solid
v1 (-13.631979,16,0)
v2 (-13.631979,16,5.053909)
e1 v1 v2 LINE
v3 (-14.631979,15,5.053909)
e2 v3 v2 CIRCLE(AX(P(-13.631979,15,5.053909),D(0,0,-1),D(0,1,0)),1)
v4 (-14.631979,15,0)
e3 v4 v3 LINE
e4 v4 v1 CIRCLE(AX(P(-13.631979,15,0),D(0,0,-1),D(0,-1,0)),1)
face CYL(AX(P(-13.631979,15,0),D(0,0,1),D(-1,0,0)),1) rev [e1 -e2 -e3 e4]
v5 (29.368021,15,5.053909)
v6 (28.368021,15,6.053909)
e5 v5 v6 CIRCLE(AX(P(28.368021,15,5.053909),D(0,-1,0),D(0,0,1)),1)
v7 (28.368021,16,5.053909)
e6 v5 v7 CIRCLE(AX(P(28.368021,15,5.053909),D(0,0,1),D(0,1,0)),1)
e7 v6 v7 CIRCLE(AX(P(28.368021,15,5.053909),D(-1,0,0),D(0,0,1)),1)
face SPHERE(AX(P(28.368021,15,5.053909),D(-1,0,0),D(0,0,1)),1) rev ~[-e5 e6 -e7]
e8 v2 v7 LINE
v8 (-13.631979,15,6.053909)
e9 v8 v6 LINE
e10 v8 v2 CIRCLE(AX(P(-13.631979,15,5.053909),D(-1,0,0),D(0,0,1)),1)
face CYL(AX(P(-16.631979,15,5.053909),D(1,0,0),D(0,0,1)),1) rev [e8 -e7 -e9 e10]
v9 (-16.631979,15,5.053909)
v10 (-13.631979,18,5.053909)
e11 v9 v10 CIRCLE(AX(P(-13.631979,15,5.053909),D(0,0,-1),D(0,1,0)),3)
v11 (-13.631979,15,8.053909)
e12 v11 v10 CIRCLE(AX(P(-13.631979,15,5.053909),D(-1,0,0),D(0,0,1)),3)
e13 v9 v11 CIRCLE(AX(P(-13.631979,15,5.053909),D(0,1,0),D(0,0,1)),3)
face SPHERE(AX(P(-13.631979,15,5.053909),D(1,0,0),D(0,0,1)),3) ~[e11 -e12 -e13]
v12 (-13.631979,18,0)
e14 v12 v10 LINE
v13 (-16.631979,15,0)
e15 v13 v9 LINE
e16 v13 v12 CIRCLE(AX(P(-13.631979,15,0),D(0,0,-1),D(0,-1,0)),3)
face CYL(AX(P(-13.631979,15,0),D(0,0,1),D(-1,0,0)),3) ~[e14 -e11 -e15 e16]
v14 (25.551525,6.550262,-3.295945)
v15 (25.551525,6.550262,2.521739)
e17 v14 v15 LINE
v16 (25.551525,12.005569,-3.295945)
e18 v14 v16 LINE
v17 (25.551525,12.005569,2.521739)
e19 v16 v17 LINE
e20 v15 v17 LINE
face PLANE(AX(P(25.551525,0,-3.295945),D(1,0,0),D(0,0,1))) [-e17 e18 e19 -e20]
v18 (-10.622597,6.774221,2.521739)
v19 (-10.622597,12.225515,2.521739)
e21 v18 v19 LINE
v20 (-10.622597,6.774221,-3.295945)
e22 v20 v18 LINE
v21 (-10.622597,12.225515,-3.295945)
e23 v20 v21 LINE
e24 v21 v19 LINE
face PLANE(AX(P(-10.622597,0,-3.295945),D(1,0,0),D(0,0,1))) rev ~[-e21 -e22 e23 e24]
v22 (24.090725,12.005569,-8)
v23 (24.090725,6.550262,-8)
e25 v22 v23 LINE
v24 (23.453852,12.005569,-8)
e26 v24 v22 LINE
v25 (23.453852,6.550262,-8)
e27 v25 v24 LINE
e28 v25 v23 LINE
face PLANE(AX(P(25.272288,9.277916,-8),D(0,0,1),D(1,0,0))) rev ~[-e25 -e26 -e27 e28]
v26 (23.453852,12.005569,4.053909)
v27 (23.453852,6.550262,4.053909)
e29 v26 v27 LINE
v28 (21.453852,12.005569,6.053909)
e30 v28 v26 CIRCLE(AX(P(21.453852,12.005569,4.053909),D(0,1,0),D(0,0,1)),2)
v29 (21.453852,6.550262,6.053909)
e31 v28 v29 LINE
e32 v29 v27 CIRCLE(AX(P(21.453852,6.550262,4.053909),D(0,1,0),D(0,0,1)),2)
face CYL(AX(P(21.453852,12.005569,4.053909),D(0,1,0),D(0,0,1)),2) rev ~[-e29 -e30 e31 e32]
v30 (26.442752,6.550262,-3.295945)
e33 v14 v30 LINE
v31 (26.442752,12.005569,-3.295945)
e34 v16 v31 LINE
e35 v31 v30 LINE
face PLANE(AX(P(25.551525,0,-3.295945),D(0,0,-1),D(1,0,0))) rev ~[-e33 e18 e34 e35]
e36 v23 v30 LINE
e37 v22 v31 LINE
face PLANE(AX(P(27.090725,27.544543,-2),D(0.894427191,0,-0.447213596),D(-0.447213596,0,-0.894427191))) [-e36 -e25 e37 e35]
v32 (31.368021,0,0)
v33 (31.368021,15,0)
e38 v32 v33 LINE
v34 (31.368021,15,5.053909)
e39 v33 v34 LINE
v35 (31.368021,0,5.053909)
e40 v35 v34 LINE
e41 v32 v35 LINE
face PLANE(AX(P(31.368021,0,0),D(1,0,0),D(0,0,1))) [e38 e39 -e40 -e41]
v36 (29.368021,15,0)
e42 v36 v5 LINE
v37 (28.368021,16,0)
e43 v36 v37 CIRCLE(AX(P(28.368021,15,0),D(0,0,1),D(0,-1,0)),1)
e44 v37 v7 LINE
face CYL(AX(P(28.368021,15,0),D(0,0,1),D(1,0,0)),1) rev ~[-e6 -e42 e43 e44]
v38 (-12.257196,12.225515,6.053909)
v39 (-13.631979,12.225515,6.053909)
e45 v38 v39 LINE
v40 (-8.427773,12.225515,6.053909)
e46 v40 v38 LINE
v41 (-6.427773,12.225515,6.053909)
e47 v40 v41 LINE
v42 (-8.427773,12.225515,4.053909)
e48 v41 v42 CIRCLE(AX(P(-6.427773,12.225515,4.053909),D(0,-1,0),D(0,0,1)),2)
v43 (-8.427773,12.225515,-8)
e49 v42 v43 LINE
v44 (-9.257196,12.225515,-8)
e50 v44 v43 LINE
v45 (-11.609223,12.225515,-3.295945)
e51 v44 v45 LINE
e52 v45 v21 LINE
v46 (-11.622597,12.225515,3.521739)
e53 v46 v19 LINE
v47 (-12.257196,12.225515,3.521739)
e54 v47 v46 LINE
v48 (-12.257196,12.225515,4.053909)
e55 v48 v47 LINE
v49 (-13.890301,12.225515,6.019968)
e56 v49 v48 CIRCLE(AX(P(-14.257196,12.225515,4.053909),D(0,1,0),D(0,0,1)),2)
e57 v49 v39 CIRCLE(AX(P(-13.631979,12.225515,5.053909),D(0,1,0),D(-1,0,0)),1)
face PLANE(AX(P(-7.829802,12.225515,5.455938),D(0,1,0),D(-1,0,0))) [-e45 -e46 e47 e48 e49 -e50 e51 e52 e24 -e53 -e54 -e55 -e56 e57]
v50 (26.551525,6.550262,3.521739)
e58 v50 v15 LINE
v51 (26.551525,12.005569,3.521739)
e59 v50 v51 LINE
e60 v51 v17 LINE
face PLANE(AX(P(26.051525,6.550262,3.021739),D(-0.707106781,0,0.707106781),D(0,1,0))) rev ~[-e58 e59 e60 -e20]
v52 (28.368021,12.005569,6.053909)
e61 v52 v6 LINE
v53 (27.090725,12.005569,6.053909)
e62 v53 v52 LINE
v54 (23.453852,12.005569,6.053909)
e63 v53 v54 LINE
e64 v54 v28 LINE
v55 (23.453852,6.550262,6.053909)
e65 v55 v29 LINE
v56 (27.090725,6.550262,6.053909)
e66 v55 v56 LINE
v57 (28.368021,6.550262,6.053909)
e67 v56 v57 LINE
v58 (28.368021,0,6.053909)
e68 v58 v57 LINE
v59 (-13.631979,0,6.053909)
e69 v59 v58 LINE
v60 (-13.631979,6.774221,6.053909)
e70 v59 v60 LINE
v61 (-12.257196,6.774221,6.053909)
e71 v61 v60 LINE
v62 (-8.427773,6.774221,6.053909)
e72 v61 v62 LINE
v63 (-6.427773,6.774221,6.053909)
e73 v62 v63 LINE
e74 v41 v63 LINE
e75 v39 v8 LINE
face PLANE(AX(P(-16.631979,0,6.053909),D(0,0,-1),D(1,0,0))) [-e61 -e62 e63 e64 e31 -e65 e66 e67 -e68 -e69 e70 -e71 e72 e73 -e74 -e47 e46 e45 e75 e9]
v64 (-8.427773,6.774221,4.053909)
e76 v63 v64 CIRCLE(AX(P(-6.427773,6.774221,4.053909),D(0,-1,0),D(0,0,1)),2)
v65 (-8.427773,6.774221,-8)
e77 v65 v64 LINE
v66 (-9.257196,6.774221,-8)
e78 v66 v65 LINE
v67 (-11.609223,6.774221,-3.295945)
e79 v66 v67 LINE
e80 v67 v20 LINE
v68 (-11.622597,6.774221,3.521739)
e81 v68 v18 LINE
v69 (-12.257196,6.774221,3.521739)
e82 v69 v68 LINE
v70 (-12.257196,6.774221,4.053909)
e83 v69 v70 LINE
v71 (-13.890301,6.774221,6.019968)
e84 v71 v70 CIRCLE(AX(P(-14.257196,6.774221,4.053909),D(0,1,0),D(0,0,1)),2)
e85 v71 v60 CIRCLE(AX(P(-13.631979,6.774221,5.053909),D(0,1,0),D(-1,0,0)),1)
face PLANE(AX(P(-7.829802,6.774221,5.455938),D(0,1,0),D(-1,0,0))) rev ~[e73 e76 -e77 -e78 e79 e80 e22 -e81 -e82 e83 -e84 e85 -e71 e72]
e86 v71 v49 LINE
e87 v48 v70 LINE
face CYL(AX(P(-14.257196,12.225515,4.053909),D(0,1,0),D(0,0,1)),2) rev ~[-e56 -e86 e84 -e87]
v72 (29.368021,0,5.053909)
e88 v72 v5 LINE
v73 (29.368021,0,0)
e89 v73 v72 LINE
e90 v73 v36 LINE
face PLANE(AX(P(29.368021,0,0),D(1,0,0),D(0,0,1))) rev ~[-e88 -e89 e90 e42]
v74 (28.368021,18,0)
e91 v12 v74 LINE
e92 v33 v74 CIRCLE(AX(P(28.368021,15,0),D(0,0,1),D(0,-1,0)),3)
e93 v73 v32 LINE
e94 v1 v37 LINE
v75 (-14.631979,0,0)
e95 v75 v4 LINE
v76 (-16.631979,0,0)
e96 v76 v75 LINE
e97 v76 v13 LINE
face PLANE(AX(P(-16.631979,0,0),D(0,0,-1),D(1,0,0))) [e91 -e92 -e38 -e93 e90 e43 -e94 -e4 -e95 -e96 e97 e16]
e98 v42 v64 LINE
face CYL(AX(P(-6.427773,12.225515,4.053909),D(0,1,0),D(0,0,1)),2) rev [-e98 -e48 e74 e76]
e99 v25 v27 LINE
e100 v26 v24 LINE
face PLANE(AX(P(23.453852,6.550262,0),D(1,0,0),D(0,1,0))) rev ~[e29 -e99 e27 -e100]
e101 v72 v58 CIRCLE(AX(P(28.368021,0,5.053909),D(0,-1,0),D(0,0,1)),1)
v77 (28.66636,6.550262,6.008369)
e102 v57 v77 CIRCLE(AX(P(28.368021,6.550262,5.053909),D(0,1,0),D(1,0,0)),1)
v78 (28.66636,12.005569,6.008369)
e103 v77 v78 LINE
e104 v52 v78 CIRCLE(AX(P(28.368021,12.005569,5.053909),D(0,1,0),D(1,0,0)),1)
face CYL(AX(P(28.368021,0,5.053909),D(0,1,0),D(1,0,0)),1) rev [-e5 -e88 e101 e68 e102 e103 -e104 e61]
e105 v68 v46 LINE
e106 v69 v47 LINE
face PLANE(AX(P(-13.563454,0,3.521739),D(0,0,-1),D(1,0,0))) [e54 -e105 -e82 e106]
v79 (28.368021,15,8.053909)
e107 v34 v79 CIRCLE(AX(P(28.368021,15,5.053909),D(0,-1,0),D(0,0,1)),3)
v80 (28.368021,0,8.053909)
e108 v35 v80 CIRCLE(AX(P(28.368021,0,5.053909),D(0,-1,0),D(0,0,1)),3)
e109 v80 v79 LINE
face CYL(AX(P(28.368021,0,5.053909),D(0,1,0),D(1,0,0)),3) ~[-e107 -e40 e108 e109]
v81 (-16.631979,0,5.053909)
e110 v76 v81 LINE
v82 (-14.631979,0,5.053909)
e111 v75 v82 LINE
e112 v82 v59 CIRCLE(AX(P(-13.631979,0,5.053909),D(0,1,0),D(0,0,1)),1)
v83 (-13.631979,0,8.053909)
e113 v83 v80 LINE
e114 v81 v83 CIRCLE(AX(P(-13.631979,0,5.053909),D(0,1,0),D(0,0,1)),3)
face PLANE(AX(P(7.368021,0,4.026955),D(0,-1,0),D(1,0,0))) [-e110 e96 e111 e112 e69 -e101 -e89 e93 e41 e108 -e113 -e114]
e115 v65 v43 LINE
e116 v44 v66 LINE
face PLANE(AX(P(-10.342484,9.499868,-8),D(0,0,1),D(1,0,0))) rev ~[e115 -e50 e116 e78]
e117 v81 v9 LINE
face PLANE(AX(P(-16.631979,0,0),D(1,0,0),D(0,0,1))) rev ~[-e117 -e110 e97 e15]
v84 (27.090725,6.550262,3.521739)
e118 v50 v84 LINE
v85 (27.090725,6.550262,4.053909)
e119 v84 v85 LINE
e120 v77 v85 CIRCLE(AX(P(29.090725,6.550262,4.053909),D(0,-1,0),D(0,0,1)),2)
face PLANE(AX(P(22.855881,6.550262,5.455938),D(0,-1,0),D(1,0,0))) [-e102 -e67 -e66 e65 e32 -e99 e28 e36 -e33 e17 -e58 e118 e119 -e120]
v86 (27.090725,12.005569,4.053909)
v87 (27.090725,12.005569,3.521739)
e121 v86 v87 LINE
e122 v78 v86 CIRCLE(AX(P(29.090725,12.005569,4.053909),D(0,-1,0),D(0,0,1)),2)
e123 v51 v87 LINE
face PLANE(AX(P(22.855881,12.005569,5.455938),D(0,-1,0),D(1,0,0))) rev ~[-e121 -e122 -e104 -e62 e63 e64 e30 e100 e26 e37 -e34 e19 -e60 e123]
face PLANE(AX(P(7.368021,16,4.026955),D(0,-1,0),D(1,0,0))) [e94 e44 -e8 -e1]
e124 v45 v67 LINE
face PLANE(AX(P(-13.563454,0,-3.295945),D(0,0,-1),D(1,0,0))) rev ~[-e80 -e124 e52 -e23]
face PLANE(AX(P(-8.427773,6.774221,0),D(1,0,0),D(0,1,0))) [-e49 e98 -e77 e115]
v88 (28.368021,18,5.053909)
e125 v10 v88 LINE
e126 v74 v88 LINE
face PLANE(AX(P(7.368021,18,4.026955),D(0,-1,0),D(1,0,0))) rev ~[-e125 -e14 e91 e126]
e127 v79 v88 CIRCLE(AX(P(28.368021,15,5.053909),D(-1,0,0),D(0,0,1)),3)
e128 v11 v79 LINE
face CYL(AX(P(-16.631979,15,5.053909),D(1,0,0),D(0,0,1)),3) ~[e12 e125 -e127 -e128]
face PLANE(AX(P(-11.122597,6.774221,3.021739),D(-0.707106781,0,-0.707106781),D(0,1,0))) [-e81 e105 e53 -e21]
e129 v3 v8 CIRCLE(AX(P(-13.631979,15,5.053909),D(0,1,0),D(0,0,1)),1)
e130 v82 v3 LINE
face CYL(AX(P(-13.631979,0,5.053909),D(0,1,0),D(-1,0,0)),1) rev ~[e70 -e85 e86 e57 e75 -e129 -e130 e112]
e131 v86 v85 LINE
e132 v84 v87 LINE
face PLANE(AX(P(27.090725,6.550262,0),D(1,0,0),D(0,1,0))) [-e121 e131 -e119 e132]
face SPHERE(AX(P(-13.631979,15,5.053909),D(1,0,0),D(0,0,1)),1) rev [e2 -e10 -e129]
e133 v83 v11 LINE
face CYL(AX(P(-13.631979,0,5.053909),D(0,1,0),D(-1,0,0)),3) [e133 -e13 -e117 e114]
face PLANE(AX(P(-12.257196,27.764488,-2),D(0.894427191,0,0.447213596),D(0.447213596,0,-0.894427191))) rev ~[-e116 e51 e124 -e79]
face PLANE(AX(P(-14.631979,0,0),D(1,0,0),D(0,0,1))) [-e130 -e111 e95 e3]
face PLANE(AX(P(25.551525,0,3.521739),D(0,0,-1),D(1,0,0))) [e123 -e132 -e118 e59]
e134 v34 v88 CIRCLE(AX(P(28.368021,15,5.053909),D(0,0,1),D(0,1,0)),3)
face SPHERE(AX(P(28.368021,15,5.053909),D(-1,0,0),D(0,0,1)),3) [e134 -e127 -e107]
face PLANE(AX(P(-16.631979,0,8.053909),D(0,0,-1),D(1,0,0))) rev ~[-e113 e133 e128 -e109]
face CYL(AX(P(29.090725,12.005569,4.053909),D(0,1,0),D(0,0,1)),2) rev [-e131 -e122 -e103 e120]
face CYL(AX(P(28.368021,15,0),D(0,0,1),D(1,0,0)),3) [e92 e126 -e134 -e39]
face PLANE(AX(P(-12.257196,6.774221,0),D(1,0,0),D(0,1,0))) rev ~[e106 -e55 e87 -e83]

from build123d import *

# Parameters (mm, degrees)
F0_W         = 48
F0_H         = 8.0539090559
F1_DEPTH     = 18
F2_R         = 3
F3_T         = -2
F4_W         = 3.6368723959
F4_H         = 5.4553076625
F5_DEPTH     = 8
F6_W         = 3.8294224069
F6_H         = 5.4512945935
F7_DEPTH     = 8
F8_W         = 2.2997260094
F8_H         = 6.8176840032
F9_DEPTH     = 13.4
F8_W_2       = 2.9408568516
F11_T1_DEPTH = 36.529241079
F12_T1_DEPTH = 36.5332541479
F13_T1_DEPTH = 5.4512945935
F13_T3_DEPTH = 5.4553076625
F14_SIZE     = 1


# Not quite as in the source:
# - a fillet or chamfer that OpenCascade refuses, or shapes differently, is made with other operations: its cross-section is extruded or revolved along the edge and cut away or added


with BuildPart() as f1:
    # F0 (on Front) → F1 (new body)
    with BuildSketch(Plane.XZ):
        with Locations((7.3680209219, 4.0269545279)):
            Rectangle(F0_W, F0_H)
    extrude(amount=-F1_DEPTH)

    # F2
    f2_edges = [f1.edges().sort_by_distance(p)[0] for p in [
        (7.368021, 18, 8.053909),
        (-16.631979, 9, 8.053909),
        (31.368021, 9, 8.053909),
        (-16.631979, 18, 4.026955),
        (31.368021, 18, 4.026955),
    ]]
    fillet(f2_edges, radius=F2_R)

    # F3
    f3_openings = [f1.faces().sort_by_distance(p)[0] for p in [
        (7.368021, 0, 3.993074),
        (7.368021, 8.962591, 0),
    ]]
    offset(amount=F3_T, openings=f3_openings)

    # F4 (on Top) → F5 (join, symmetric)
    with BuildSketch(Plane.XY):
        with Locations((25.2722883597, 9.2779155821)):
            Rectangle(F4_W, F4_H)
    extrude(amount=F5_DEPTH, both=True)

    # F6 (on Top) → F7 (join, symmetric)
    with BuildSketch(Plane.XY):
        with Locations((-10.3424843401, 9.4998679124)):
            Rectangle(F6_W, F6_H)
    extrude(amount=F7_DEPTH, both=True)


with BuildPart() as f9:
    # F8 (on Front) → F9 (new body)
    with BuildSketch(Plane.XZ):
        with Locations((26.7013879493, 0.1128966487)):
            Rectangle(F8_W, F8_H)
    extrude(amount=-F9_DEPTH)


with BuildPart() as f9b:
    # F8 (on Front) → F9, piece 2 (new body)
    with BuildSketch(Plane.XZ):
        with Locations((-12.0930257253, 0.1128966487)):
            Rectangle(F8_W_2, F8_H)
    extrude(amount=-F9_DEPTH)


with BuildPart() as f1_1:
    add(f1.part)

    # F10: cut F9, F9b
    add(f9.part, mode=Mode.SUBTRACT)
    add(f9b.part, mode=Mode.SUBTRACT)

    # F11: chamfer of 6 x 3 on 1 edges, made by hand

    # F11_s2 → F11_t1 (cut)
    with BuildSketch(Plane.XZ.offset(-27.7644884519)):
        Polygon((-12.2571955435, -2), (-9.2571955435, -8), (-12.2571955435, -8), align=None)
    extrude(amount=F11_T1_DEPTH, mode=Mode.SUBTRACT)

    # F12: chamfer of 3 x 6 on 1 edges, made by hand

    # F12_s2 → F12_t1 (cut)
    with BuildSketch(Plane.XZ.offset(-27.544542656)):
        Polygon((27.0907245576, -2), (24.0907245576, -8), (27.0907245576, -8), align=None)
    extrude(amount=F12_T1_DEPTH, mode=Mode.SUBTRACT)

    # F13: fillet of radius 2 on 4 edges, made by hand

    # F13_s2 → F13_t1 (join)
    with BuildSketch(Plane.XZ.offset(-12.2255152091)):
        with BuildLine():
            ThreePointArc((-6.4277731366, 6.0539090559), (-7.841986699, 5.4681226183), (-8.4277731366, 4.0539090559))
            Line((-8.4277731366, 4.0539090559), (-8.4677731366, 4.0539090559))
            Line((-8.4677731366, 4.0539090559), (-8.4677731366, 6.0939090559))
            Line((-8.4677731366, 6.0939090559), (-6.4277731366, 6.0939090559))
            Line((-6.4277731366, 6.0939090559), (-6.4277731366, 6.0539090559))
        make_face()
        with BuildLine():
            ThreePointArc((-14.2571955435, 6.0539090559), (-12.8429819811, 5.4681226183), (-12.2571955435, 4.0539090559))
            Line((-12.2571955435, 4.0539090559), (-12.2171955435, 4.0539090559))
            Line((-12.2171955435, 4.0539090559), (-12.2171955435, 6.0939090559))
            Line((-12.2171955435, 6.0939090559), (-14.2571955435, 6.0939090559))
            Line((-14.2571955435, 6.0939090559), (-14.2571955435, 6.0539090559))
        make_face()
    extrude(amount=F13_T1_DEPTH)

    # F13_s4 → F13_t3 (join)
    with BuildSketch(Plane.XZ.offset(-12.0055694133)):
        with BuildLine():
            ThreePointArc((21.4538521618, 6.0539090559), (22.8680657241, 5.4681226183), (23.4538521618, 4.0539090559))
            Line((23.4538521618, 4.0539090559), (23.4938521618, 4.0539090559))
            Line((23.4938521618, 4.0539090559), (23.4938521618, 6.0939090559))
            Line((23.4938521618, 6.0939090559), (21.4538521618, 6.0939090559))
            Line((21.4538521618, 6.0939090559), (21.4538521618, 6.0539090559))
        make_face()
        with BuildLine():
            ThreePointArc((29.0907245576, 6.0539090559), (27.6765109953, 5.4681226183), (27.0907245576, 4.0539090559))
            Line((27.0907245576, 4.0539090559), (27.0507245576, 4.0539090559))
            Line((27.0507245576, 4.0539090559), (27.0507245576, 6.0939090559))
            Line((27.0507245576, 6.0939090559), (29.0907245576, 6.0939090559))
            Line((29.0907245576, 6.0939090559), (29.0907245576, 6.0539090559))
        make_face()
    extrude(amount=F13_T3_DEPTH)

    # F14
    f14_edges = [f1_1.edges().sort_by_distance(p)[0] for p in [
        (25.551525, 9.277916, 3.521739),
        (-10.622597, 9.499868, 3.521739),
    ]]
    chamfer(f14_edges, length=F14_SIZE)


solid = f1_1.part
